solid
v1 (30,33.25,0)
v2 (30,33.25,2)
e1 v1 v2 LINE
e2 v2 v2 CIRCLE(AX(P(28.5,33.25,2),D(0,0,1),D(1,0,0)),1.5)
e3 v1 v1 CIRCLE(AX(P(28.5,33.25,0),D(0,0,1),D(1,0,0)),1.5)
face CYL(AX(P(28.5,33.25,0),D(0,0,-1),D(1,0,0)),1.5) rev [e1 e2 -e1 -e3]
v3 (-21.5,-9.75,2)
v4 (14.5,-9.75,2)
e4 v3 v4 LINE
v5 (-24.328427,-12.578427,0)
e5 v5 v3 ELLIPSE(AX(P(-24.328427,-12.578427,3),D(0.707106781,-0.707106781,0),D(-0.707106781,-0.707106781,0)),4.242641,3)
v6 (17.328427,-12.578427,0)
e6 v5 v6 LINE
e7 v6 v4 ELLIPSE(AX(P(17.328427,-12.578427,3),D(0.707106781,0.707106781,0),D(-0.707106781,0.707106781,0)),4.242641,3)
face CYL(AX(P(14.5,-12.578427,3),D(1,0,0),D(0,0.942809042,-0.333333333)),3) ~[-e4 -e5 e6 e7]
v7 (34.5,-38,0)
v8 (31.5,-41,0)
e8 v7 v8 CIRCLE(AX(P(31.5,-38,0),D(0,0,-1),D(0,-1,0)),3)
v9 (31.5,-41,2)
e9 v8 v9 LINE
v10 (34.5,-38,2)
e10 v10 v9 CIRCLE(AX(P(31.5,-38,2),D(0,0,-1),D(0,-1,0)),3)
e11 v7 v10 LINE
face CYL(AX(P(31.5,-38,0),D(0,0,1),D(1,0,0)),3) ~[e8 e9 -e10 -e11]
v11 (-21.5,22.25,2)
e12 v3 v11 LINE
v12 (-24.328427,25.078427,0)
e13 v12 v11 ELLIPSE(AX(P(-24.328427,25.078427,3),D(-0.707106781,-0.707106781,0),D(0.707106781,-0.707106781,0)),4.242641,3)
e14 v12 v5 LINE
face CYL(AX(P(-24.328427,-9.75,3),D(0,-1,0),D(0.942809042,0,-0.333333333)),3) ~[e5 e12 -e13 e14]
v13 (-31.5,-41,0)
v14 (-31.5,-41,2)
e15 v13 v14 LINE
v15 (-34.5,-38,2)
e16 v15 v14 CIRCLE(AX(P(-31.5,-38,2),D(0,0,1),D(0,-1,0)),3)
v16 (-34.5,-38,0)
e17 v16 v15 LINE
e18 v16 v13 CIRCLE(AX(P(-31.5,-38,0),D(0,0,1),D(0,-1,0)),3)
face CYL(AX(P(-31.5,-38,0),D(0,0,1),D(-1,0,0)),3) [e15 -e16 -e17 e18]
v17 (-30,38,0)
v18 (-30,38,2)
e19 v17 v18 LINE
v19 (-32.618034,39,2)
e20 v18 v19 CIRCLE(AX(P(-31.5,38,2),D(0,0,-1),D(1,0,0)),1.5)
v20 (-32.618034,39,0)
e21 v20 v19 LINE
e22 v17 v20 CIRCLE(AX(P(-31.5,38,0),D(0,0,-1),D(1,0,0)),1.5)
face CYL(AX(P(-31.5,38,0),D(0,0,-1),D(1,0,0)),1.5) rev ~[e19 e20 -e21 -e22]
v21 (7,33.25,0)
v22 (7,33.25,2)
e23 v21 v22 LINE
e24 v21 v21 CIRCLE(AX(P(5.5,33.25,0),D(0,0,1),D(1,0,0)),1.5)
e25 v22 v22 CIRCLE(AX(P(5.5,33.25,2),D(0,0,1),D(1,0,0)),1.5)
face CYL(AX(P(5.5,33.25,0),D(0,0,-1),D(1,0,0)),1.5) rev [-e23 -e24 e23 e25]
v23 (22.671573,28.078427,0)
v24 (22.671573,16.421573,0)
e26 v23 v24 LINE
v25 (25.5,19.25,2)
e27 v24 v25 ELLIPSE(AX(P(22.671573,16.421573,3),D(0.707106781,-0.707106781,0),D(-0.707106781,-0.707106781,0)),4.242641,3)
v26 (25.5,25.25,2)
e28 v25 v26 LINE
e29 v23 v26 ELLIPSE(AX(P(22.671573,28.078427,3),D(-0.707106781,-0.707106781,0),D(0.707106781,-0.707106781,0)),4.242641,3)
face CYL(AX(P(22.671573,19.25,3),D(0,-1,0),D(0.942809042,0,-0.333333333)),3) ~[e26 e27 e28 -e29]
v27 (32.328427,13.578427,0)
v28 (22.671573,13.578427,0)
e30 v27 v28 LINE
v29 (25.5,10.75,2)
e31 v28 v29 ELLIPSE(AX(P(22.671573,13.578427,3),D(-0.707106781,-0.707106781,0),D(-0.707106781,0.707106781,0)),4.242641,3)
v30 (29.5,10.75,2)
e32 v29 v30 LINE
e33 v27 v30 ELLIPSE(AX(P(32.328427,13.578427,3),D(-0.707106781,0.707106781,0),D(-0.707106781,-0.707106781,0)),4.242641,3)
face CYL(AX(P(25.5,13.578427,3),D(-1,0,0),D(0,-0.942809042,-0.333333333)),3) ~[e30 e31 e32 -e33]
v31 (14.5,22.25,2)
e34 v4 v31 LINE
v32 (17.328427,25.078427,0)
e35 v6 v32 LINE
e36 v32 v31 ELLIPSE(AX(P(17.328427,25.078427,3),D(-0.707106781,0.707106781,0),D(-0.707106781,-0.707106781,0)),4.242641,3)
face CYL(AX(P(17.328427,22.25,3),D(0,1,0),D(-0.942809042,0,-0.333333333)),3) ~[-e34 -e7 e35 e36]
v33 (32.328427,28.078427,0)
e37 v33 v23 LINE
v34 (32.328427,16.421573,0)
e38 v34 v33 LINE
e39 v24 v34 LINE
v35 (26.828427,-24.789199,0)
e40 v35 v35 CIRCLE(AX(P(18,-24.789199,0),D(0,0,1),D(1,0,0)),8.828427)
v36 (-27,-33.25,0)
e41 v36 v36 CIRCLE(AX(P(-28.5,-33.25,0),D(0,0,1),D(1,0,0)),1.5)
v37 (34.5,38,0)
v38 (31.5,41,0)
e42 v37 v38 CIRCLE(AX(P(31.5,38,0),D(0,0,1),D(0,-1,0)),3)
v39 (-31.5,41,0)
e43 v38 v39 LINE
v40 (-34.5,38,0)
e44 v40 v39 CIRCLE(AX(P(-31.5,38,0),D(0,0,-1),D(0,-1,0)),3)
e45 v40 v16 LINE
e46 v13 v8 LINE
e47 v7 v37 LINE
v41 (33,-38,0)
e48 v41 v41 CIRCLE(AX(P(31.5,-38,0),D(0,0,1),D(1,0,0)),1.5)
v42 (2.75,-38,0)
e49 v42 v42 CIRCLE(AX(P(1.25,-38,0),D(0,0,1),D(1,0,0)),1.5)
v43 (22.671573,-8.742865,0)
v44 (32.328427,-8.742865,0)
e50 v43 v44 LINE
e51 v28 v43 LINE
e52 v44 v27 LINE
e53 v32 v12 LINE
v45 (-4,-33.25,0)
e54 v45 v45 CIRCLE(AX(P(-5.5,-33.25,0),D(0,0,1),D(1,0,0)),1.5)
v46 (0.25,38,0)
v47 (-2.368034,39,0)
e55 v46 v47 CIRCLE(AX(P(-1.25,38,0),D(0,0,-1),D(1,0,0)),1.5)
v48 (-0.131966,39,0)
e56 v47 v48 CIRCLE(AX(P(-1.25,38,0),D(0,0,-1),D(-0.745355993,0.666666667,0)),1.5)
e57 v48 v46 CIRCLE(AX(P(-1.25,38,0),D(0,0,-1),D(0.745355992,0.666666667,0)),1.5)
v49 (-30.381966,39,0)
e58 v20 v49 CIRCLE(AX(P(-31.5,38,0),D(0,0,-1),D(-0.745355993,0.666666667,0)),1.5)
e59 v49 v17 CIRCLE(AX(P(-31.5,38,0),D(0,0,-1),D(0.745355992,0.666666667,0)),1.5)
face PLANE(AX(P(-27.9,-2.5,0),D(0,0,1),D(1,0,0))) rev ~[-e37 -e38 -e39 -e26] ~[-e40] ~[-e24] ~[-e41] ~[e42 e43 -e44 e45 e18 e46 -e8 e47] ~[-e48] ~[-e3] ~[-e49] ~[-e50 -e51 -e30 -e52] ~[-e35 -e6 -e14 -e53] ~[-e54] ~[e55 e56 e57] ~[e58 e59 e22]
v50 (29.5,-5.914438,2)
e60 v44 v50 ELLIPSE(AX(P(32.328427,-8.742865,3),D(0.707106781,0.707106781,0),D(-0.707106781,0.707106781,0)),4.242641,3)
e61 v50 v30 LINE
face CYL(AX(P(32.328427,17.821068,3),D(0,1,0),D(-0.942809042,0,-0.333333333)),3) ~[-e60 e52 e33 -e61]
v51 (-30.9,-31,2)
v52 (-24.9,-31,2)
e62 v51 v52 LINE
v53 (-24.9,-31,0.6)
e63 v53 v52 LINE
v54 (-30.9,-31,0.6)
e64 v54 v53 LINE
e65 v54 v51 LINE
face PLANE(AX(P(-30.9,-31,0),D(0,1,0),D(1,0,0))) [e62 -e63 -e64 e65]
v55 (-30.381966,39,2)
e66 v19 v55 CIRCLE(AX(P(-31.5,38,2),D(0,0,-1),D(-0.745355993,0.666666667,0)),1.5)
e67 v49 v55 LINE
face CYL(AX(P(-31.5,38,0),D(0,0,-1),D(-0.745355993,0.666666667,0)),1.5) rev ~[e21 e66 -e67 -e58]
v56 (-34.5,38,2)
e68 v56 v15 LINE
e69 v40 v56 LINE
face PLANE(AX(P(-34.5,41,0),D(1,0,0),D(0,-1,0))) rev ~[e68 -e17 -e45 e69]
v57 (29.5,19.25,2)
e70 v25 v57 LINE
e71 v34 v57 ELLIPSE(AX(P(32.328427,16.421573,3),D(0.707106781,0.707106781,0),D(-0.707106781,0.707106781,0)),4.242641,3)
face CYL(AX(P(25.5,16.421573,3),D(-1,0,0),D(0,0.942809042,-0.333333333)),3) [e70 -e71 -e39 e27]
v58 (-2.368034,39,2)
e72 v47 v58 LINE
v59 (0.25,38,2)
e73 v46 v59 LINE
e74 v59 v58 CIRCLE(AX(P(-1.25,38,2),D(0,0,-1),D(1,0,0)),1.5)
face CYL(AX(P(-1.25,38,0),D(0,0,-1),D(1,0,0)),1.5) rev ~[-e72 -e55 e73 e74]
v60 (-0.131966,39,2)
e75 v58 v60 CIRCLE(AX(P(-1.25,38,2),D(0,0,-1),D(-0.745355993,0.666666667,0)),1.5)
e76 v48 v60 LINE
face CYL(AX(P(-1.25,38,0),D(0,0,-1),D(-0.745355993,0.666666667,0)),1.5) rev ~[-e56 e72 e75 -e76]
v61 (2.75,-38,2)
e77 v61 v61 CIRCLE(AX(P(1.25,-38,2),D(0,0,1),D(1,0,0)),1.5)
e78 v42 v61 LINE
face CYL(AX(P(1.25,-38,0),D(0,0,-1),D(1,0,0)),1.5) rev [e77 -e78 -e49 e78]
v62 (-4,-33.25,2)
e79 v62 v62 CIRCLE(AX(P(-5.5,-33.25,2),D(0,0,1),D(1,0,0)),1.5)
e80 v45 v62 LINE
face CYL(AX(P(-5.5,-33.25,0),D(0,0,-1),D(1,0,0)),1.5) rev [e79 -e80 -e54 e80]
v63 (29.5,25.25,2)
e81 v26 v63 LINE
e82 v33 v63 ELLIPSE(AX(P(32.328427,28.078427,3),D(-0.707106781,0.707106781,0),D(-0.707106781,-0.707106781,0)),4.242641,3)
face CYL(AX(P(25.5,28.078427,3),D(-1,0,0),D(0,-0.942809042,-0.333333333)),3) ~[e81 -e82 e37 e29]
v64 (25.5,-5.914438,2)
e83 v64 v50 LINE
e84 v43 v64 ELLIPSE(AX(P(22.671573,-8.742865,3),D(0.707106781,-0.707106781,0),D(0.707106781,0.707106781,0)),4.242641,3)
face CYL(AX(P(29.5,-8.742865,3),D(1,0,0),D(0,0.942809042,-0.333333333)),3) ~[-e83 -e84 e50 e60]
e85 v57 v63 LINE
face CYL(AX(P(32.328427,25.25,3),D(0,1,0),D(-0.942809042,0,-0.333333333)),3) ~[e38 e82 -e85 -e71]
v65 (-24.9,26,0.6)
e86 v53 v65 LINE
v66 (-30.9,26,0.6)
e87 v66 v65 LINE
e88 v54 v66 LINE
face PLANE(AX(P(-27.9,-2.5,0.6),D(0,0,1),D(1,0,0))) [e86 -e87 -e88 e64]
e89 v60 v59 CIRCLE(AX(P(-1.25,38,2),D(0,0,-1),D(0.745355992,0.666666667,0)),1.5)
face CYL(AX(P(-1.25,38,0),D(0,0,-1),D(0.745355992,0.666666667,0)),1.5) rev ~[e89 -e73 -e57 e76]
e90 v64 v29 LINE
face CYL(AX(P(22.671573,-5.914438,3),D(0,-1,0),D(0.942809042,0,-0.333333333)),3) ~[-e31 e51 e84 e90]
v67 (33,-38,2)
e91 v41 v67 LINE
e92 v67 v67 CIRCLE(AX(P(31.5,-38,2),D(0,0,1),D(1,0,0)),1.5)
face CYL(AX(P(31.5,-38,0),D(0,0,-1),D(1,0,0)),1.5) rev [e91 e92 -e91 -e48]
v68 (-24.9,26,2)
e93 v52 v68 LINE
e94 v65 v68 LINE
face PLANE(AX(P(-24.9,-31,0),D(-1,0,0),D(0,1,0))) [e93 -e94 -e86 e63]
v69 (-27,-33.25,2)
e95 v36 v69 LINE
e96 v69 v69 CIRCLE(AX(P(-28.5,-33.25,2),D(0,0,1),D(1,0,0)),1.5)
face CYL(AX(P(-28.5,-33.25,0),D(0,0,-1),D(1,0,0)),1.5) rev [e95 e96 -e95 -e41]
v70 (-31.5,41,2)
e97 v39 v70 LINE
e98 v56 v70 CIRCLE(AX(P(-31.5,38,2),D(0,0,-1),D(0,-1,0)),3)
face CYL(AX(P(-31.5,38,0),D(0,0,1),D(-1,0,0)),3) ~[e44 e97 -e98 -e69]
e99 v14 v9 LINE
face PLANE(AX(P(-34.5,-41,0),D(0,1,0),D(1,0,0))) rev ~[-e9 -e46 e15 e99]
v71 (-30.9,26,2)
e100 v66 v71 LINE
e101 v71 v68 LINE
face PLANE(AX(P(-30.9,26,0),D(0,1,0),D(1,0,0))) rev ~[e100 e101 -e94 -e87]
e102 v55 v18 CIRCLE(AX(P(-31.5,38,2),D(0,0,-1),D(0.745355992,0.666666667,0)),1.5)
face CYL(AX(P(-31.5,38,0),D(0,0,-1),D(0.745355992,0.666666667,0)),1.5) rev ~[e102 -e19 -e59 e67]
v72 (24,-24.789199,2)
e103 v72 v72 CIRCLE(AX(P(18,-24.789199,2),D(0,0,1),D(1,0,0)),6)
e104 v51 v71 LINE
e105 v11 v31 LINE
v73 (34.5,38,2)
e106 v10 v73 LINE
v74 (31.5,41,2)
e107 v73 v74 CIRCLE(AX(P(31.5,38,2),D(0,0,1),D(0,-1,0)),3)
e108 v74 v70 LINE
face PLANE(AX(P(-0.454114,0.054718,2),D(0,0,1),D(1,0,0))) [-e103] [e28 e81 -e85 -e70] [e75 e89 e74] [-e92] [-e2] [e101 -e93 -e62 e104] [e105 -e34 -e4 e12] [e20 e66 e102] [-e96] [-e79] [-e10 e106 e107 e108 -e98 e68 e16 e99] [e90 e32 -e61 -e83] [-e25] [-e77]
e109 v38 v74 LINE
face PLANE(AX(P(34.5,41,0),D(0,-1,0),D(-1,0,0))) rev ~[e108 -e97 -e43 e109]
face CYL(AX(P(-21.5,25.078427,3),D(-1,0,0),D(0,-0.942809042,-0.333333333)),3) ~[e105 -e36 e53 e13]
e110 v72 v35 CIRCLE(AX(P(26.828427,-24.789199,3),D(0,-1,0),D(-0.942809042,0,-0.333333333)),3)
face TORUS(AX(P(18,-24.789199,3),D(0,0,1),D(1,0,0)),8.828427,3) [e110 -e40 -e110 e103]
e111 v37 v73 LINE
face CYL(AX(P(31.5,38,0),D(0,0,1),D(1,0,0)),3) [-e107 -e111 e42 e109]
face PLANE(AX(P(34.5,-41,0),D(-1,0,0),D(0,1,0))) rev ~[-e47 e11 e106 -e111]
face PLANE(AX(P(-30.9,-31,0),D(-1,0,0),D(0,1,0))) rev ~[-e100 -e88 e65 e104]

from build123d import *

# Parameters (mm, degrees)
F0_R          = 1.5
F0_R_2        = 6
F0_W          = 6
F0_H          = 57
F0_W_2        = 36
F0_H_2        = 32
F0_W_3        = 4
F0_H_3        = 16.6644380502
F0_H_4        = 6
F0_W_4        = 4.7
F0_H_5        = 2
F0_W_5        = 13
F0_W_6        = 2.3
F0_W_7        = 1.5
F0_W_8        = 9
F0_W_9        = 11
F1_DEPTH      = 2
F2_T1_DEPTH   = 16.6644380502
F2_T3_DEPTH   = 4
F2_T5_DEPTH   = 6
F2_T7_DEPTH   = 32
F2_T9_DEPTH   = 36
F2_T17_DEPTH  = 11.0710678119
F2_T21_DEPTH  = 23.7355058621
F2_T28_DEPTH  = 11.0710678119
F2_T32_DEPTH  = 23.7355058621
F2_T39_DEPTH  = 23.7355058621
F2_T43_DEPTH  = 11.0710678119
F2_T51_DEPTH  = 11.0710678119
F2_T56_DEPTH  = 23.7355058621
F2_T63_DEPTH  = 13.0710678119
F2_T67_DEPTH  = 11.0710678119
F2_T75_DEPTH  = 13.0710678119
F2_T79_DEPTH  = 11.0710678119
F2_T86_DEPTH  = 11.0710678119
F2_T91_DEPTH  = 13.0710678119
F2_S93_R      = 1.5
F2_T94_DEPTH  = 8
F2_T100_DEPTH = 13.0710678119
F2_T104_DEPTH = 11.0710678119
F2_T111_DEPTH = 43.0710678119
F2_T115_DEPTH = 39.0710678119
F2_T122_DEPTH = 39.0710678119
F2_T126_DEPTH = 43.0710678119
F2_T133_DEPTH = 39.0710678119
F2_T137_DEPTH = 43.0710678119
F2_T145_DEPTH = 39.0710678119
F2_T149_DEPTH = 43.0710678119
F3_R          = 3
F4_DEPTH      = 0.6


# Not quite as in the source:
# - a fillet or chamfer that OpenCascade refuses, or shapes differently, is made with other operations: its cross-section is extruded or revolved along the edge and cut away or added


with BuildPart() as f1:
    # F0 (on Top) → F1 (new body)
    with BuildSketch(Plane.XY):
        with BuildLine():
            Line((12.5, -41), (34.5, -41))
            Line((34.5, -41), (34.5, 39))
            Line((34.5, 39), (28.5, 39))
            Line((28.5, 39), (25.5, 39))
            Line((25.5, 39), (20.8, 39))
            Line((20.8, 39), (7.8, 39))
            Line((7.8, 39), (5.5, 39))
            Line((5.5, 39), (-0.1319660113, 39))
            ThreePointArc((-0.1319660113, 39), (0.1512585384, 38.5352331347), (0.25, 38))
            ThreePointArc((0.25, 38), (-1.7852331347, 36.5987414616), (-2.3680339887, 39))
            Line((-2.3680339887, 39), (-5.5, 39))
            Line((-5.5, 39), (-14.5, 39))
            Line((-14.5, 39), (-25.5, 39))
            Line((-25.5, 39), (-27, 39))
            Line((-27, 39), (-28.5, 39))
            Line((-28.5, 39), (-30.3819660113, 39))
            ThreePointArc((-30.3819660113, 39), (-30.0987414616, 38.5352331347), (-30, 38))
            ThreePointArc((-30, 38), (-32.0352331347, 36.5987414616), (-32.6180339887, 39))
            Line((-32.6180339887, 39), (-34.5, 39))
            Line((-34.5, 39), (-34.5, -41))
            Line((-34.5, -41), (-12.5, -41))
            Line((-12.5, -41), (-10.5, -41))
            Line((-10.5, -41), (10.5, -41))
            Line((10.5, -41), (12.5, -41))
        make_face()
        with Locations((-28.5, -33.25)):
            Circle(F0_R, mode=Mode.SUBTRACT)
        with Locations((-5.5, -33.25)):
            Circle(F0_R, mode=Mode.SUBTRACT)
        with Locations((1.25, -38)):
            Circle(F0_R, mode=Mode.SUBTRACT)
        with Locations((31.5, -38)):
            Circle(F0_R, mode=Mode.SUBTRACT)
        with Locations((18, -24.7891994715)):
            Circle(F0_R_2, mode=Mode.SUBTRACT)
        with Locations((-27.9, -2.5)):
            Rectangle(F0_W, F0_H, mode=Mode.SUBTRACT)
        with Locations((-3.5, 6.25)):
            Rectangle(F0_W_2, F0_H_2, mode=Mode.SUBTRACT)
        with Locations((-28.5, 33.25)):
            Circle(F0_R, mode=Mode.SUBTRACT)
        with Locations((-5.5, 33.25)):
            Circle(F0_R, mode=Mode.SUBTRACT)
        with Locations((27.5, 2.4177809749)):
            Rectangle(F0_W_3, F0_H_3, mode=Mode.SUBTRACT)
        with Locations((5.5, 33.25)):
            Circle(F0_R, mode=Mode.SUBTRACT)
        with Locations((27.5, 22.25)):
            Rectangle(F0_W_3, F0_H_4, mode=Mode.SUBTRACT)
        with Locations((28.5, 33.25)):
            Circle(F0_R, mode=Mode.SUBTRACT)
        Polygon((28.5, 39), (34.5, 39), (34.5, 41), (28, 41), (25.5, 41), (25.5, 39), align=None)
        with Locations((23.15, 40)):
            Rectangle(F0_W_4, F0_H_5)
        with Locations((14.3, 40)):
            Rectangle(F0_W_5, F0_H_5)
        with Locations((6.65, 40)):
            Rectangle(F0_W_6, F0_H_5)
        with BuildLine():
            Line((-34.5, 41), (-34.5, 39))
            Line((-34.5, 39), (-32.6180339887, 39))
            ThreePointArc((-32.6180339887, 39), (-31.5, 39.5), (-30.3819660113, 39))
            Line((-30.3819660113, 39), (-28.5, 39))
            Line((-28.5, 39), (-27, 39))
            Line((-27, 39), (-27, 41))
            Line((-27, 41), (-34.5, 41))
        make_face()
        with BuildLine():
            Line((-0.1319660113, 39), (5.5, 39))
            Line((5.5, 39), (5.5, 41))
            Line((5.5, 41), (-5.5, 41))
            Line((-5.5, 41), (-5.5, 39))
            Line((-5.5, 39), (-2.3680339887, 39))
            ThreePointArc((-2.3680339887, 39), (-1.25, 39.5), (-0.1319660113, 39))
        make_face()
        with Locations((-26.25, 40)):
            Rectangle(F0_W_7, F0_H_5)
        with Locations((-10, 40)):
            Rectangle(F0_W_8, F0_H_5)
        with Locations((-20, 40)):
            Rectangle(F0_W_9, F0_H_5)
        with Locations((-28.5, 33.25)):
            Circle(F0_R)
        with Locations((-5.5, 33.25)):
            Circle(F0_R)
    extrude(amount=F1_DEPTH)

    # F2: fillet of radius 3 on 13 edges, made by hand

    # F2_s2 → F2_t1 (cut)
    with BuildSketch(Plane.XZ.offset(-10.75)):
        with BuildLine():
            ThreePointArc((25.5, 2), (24.4036236828, 0.5505102572), (22.6715728753, 0))
            Line((22.6715728753, 0), (25.5, 0))
            Line((25.5, 0), (25.5, 2))
        make_face()
        with BuildLine():
            ThreePointArc((29.5, 2), (30.5963763172, 0.5505102572), (32.3284271247, 0))
            Line((32.3284271247, 0), (29.5, 0))
            Line((29.5, 0), (29.5, 2))
        make_face()
    extrude(amount=F2_T1_DEPTH, mode=Mode.SUBTRACT)

    # F2_s4 → F2_t3 (cut)
    with BuildSketch(Plane.YZ.offset(25.5)):
        with BuildLine():
            ThreePointArc((-5.9144380502, 2), (-7.0108143674, 0.5505102572), (-8.742865175, 0))
            Line((-8.742865175, 0), (-5.9144380502, 0))
            Line((-5.9144380502, 0), (-5.9144380502, 2))
        make_face()
        with BuildLine():
            ThreePointArc((10.75, 2), (11.8463763172, 0.5505102572), (13.5784271247, 0))
            Line((13.5784271247, 0), (10.75, 0))
            Line((10.75, 0), (10.75, 2))
        make_face()
        with BuildLine():
            ThreePointArc((19.25, 2), (18.1536236828, 0.5505102572), (16.4215728753, 0))
            Line((16.4215728753, 0), (19.25, 0))
            Line((19.25, 0), (19.25, 2))
        make_face()
        with BuildLine():
            ThreePointArc((25.25, 2), (26.3463763172, 0.5505102572), (28.0784271247, 0))
            Line((28.0784271247, 0), (25.25, 0))
            Line((25.25, 0), (25.25, 2))
        make_face()
    extrude(amount=F2_T3_DEPTH, mode=Mode.SUBTRACT)

    # F2_s6 → F2_t5 (cut)
    with BuildSketch(Plane.XZ.offset(-25.25)):
        with BuildLine():
            ThreePointArc((29.5, 2), (30.5963763172, 0.5505102572), (32.3284271247, 0))
            Line((32.3284271247, 0), (29.5, 0))
            Line((29.5, 0), (29.5, 2))
        make_face()
        with BuildLine():
            ThreePointArc((25.5, 2), (24.4036236828, 0.5505102572), (22.6715728753, 0))
            Line((22.6715728753, 0), (25.5, 0))
            Line((25.5, 0), (25.5, 2))
        make_face()
    extrude(amount=F2_T5_DEPTH, mode=Mode.SUBTRACT)

    # F2_s8 → F2_t7 (cut)
    with BuildSketch(Plane.XZ.offset(-22.25)):
        with BuildLine():
            ThreePointArc((14.5, 2), (15.5963763172, 0.5505102572), (17.3284271247, 0))
            Line((17.3284271247, 0), (14.5, 0))
            Line((14.5, 0), (14.5, 2))
        make_face()
        with BuildLine():
            ThreePointArc((-21.5, 2), (-22.5963763172, 0.5505102572), (-24.3284271247, 0))
            Line((-24.3284271247, 0), (-21.5, 0))
            Line((-21.5, 0), (-21.5, 2))
        make_face()
    extrude(amount=F2_T7_DEPTH, mode=Mode.SUBTRACT)

    # F2_s10 → F2_t9 (cut)
    with BuildSketch(Plane.YZ.offset(-21.5)):
        with BuildLine():
            ThreePointArc((-9.75, 2), (-10.8463763172, 0.5505102572), (-12.5784271247, 0))
            Line((-12.5784271247, 0), (-9.75, 0))
            Line((-9.75, 0), (-9.75, 2))
        make_face()
        with BuildLine():
            ThreePointArc((22.25, 2), (23.3463763172, 0.5505102572), (25.0784271247, 0))
            Line((25.0784271247, 0), (22.25, 0))
            Line((22.25, 0), (22.25, 2))
        make_face()
    extrude(amount=F2_T9_DEPTH, mode=Mode.SUBTRACT)

    # F2_s11 → F2_t12 (revolve, cut)
    with BuildSketch(Plane.XZ.offset(24.7891994715)):
        with BuildLine():
            ThreePointArc((24, 2), (25.0963763172, 0.5505102572), (26.8284271247, 0))
            Line((26.8284271247, 0), (24, 0))
            Line((24, 0), (24, 2))
        make_face()
    revolve(axis=Axis((18, -24.7891994715, 0), (0, 0, 1)), mode=Mode.SUBTRACT)


with BuildPart() as f2_tool15:
    # F2_s16 → F2_t17 (new body)
    with BuildSketch(Plane.YZ.offset(29.5)):
        with BuildLine():
            ThreePointArc((-5.9144380502, 2), (-7.0108143674, 0.5505102572), (-8.742865175, 0))
            Line((-8.742865175, 0), (-5.9144380502, 0))
            Line((-5.9144380502, 0), (-5.9144380502, 2))
        make_face()
    extrude(amount=-F2_T17_DEPTH)

    split(bisect_by=Plane.YZ.offset(25.5), keep=Keep.BOTTOM)


with BuildPart() as f2_tool19:
    # F2_s20 → F2_t21 (new body)
    with BuildSketch(Plane.XZ.offset(12.9855058621)):
        with BuildLine():
            ThreePointArc((25.5, 2), (24.4036236828, 0.5505102572), (22.6715728753, 0))
            Line((22.6715728753, 0), (25.5, 0))
            Line((25.5, 0), (25.5, 2))
        make_face()
    extrude(amount=-F2_T21_DEPTH)

    split(bisect_by=Plane.XZ.offset(5.9144380502), keep=Keep.TOP)


with BuildPart() as f2_tool15_1:
    add(f2_tool15.part)

    # F2_t23: intersect F2_tool19
    add(f2_tool19.part, mode=Mode.INTERSECT)


with BuildPart() as f1_1:
    add(f1.part)

    # F2_t13: cut F2_tool15
    add(f2_tool15_1.part, mode=Mode.SUBTRACT)


with BuildPart() as f2_tool26:
    # F2_s27 → F2_t28 (new body)
    with BuildSketch(Plane.YZ.offset(18.4289321881)):
        with BuildLine():
            ThreePointArc((10.75, 2), (11.8463763172, 0.5505102572), (13.5784271247, 0))
            Line((13.5784271247, 0), (10.75, 0))
            Line((10.75, 0), (10.75, 2))
        make_face()
    extrude(amount=F2_T28_DEPTH)

    split(bisect_by=Plane.YZ.offset(25.5), keep=Keep.BOTTOM)


with BuildPart() as f2_tool30:
    # F2_s31 → F2_t32 (new body)
    with BuildSketch(Plane.XZ.offset(5.9144380502)):
        with BuildLine():
            ThreePointArc((25.5, 2), (24.4036236828, 0.5505102572), (22.6715728753, 0))
            Line((22.6715728753, 0), (25.5, 0))
            Line((25.5, 0), (25.5, 2))
        make_face()
    extrude(amount=-F2_T32_DEPTH)

    split(bisect_by=Plane.XZ.offset(-10.75), keep=Keep.BOTTOM)


with BuildPart() as f2_tool26_1:
    add(f2_tool26.part)

    # F2_t34: intersect F2_tool30
    add(f2_tool30.part, mode=Mode.INTERSECT)


with BuildPart() as f1_2:
    add(f1_1.part)

    # F2_t24: cut F2_tool26
    add(f2_tool26_1.part, mode=Mode.SUBTRACT)


with BuildPart() as f2_tool37:
    # F2_s38 → F2_t39 (new body)
    with BuildSketch(Plane.XZ.offset(-10.75)):
        with BuildLine():
            ThreePointArc((29.5, 2), (30.5963763172, 0.5505102572), (32.3284271247, 0))
            Line((32.3284271247, 0), (29.5, 0))
            Line((29.5, 0), (29.5, 2))
        make_face()
    extrude(amount=F2_T39_DEPTH)

    split(bisect_by=Plane.XZ.offset(5.9144380502), keep=Keep.TOP)


with BuildPart() as f2_tool41:
    # F2_s42 → F2_t43 (new body)
    with BuildSketch(Plane.YZ.offset(36.5710678119)):
        with BuildLine():
            ThreePointArc((-5.9144380502, 2), (-7.0108143674, 0.5505102572), (-8.742865175, 0))
            Line((-8.742865175, 0), (-5.9144380502, 0))
            Line((-5.9144380502, 0), (-5.9144380502, 2))
        make_face()
    extrude(amount=-F2_T43_DEPTH)

    split(bisect_by=Plane.YZ.offset(34.5), keep=Keep.BOTTOM)

    split(bisect_by=Plane.YZ.offset(29.5), keep=Keep.TOP)


with BuildPart() as f2_tool37_1:
    add(f2_tool37.part)

    # F2_t46: intersect F2_tool41
    add(f2_tool41.part, mode=Mode.INTERSECT)


with BuildPart() as f1_3:
    add(f1_2.part)

    # F2_t35: cut F2_tool37
    add(f2_tool37_1.part, mode=Mode.SUBTRACT)


with BuildPart() as f2_tool49:
    # F2_s50 → F2_t51 (new body)
    with BuildSketch(Plane.YZ.offset(25.5)):
        with BuildLine():
            ThreePointArc((10.75, 2), (11.8463763172, 0.5505102572), (13.5784271247, 0))
            Line((13.5784271247, 0), (10.75, 0))
            Line((10.75, 0), (10.75, 2))
        make_face()
    extrude(amount=F2_T51_DEPTH)

    split(bisect_by=Plane.YZ.offset(34.5), keep=Keep.BOTTOM)

    split(bisect_by=Plane.YZ.offset(29.5), keep=Keep.TOP)


with BuildPart() as f2_tool54:
    # F2_s55 → F2_t56 (new body)
    with BuildSketch(Plane.XZ.offset(-17.8210678119)):
        with BuildLine():
            ThreePointArc((29.5, 2), (30.5963763172, 0.5505102572), (32.3284271247, 0))
            Line((32.3284271247, 0), (29.5, 0))
            Line((29.5, 0), (29.5, 2))
        make_face()
    extrude(amount=F2_T56_DEPTH)

    split(bisect_by=Plane.XZ.offset(-10.75), keep=Keep.BOTTOM)


with BuildPart() as f2_tool49_1:
    add(f2_tool49.part)

    # F2_t58: intersect F2_tool54
    add(f2_tool54.part, mode=Mode.INTERSECT)


with BuildPart() as f1_4:
    add(f1_3.part)

    # F2_t47: cut F2_tool49
    add(f2_tool49_1.part, mode=Mode.SUBTRACT)


with BuildPart() as f2_tool61:
    # F2_s62 → F2_t63 (new body)
    with BuildSketch(Plane.XZ.offset(-25.25)):
        with BuildLine():
            ThreePointArc((29.5, 2), (30.5963763172, 0.5505102572), (32.3284271247, 0))
            Line((32.3284271247, 0), (29.5, 0))
            Line((29.5, 0), (29.5, 2))
        make_face()
    extrude(amount=F2_T63_DEPTH)

    split(bisect_by=Plane.XZ.offset(-19.25), keep=Keep.TOP)


with BuildPart() as f2_tool65:
    # F2_s66 → F2_t67 (new body)
    with BuildSketch(Plane.YZ.offset(36.5710678119)):
        with BuildLine():
            ThreePointArc((19.25, 2), (18.1536236828, 0.5505102572), (16.4215728753, 0))
            Line((16.4215728753, 0), (19.25, 0))
            Line((19.25, 0), (19.25, 2))
        make_face()
    extrude(amount=-F2_T67_DEPTH)

    split(bisect_by=Plane.YZ.offset(34.5), keep=Keep.BOTTOM)

    split(bisect_by=Plane.YZ.offset(29.5), keep=Keep.TOP)


with BuildPart() as f2_tool61_1:
    add(f2_tool61.part)

    # F2_t70: intersect F2_tool65
    add(f2_tool65.part, mode=Mode.INTERSECT)


with BuildPart() as f1_5:
    add(f1_4.part)

    # F2_t59: cut F2_tool61
    add(f2_tool61_1.part, mode=Mode.SUBTRACT)


with BuildPart() as f2_tool73:
    # F2_s74 → F2_t75 (new body)
    with BuildSketch(Plane.XZ.offset(-12.1789321881)):
        with BuildLine():
            ThreePointArc((25.5, 2), (24.4036236828, 0.5505102572), (22.6715728753, 0))
            Line((22.6715728753, 0), (25.5, 0))
            Line((25.5, 0), (25.5, 2))
        make_face()
    extrude(amount=-F2_T75_DEPTH)

    split(bisect_by=Plane.XZ.offset(-19.25), keep=Keep.TOP)


with BuildPart() as f2_tool77:
    # F2_s78 → F2_t79 (new body)
    with BuildSketch(Plane.YZ.offset(29.5)):
        with BuildLine():
            ThreePointArc((19.25, 2), (18.1536236828, 0.5505102572), (16.4215728753, 0))
            Line((16.4215728753, 0), (19.25, 0))
            Line((19.25, 0), (19.25, 2))
        make_face()
    extrude(amount=-F2_T79_DEPTH)

    split(bisect_by=Plane.YZ.offset(25.5), keep=Keep.BOTTOM)


with BuildPart() as f2_tool73_1:
    add(f2_tool73.part)

    # F2_t81: intersect F2_tool77
    add(f2_tool77.part, mode=Mode.INTERSECT)


with BuildPart() as f1_6:
    add(f1_5.part)

    # F2_t71: cut F2_tool73
    add(f2_tool73_1.part, mode=Mode.SUBTRACT)


with BuildPart() as f2_tool84:
    # F2_s85 → F2_t86 (new body)
    with BuildSketch(Plane.YZ.offset(25.5)):
        with BuildLine():
            ThreePointArc((25.25, 2), (26.3463763172, 0.5505102572), (28.0784271247, 0))
            Line((28.0784271247, 0), (25.25, 0))
            Line((25.25, 0), (25.25, 2))
        make_face()
    extrude(amount=F2_T86_DEPTH)

    split(bisect_by=Plane.YZ.offset(34.5), keep=Keep.BOTTOM)

    split(bisect_by=Plane.YZ.offset(29.5), keep=Keep.TOP)


with BuildPart() as f2_tool89:
    # F2_s90 → F2_t91 (new body)
    with BuildSketch(Plane.XZ.offset(-32.3210678119)):
        with BuildLine():
            ThreePointArc((29.5, 2), (30.5963763172, 0.5505102572), (32.3284271247, 0))
            Line((32.3284271247, 0), (29.5, 0))
            Line((29.5, 0), (29.5, 2))
        make_face()
    extrude(amount=F2_T91_DEPTH)

    split(bisect_by=Plane.XZ.offset(-25.25), keep=Keep.BOTTOM)

    # F2_s93 → F2_t94 (cut, symmetric)
    with BuildSketch(Plane.XY.offset(1)):
        with Locations((28.5, 33.25)):
            Circle(F2_S93_R)
    extrude(amount=F2_T94_DEPTH, both=True, mode=Mode.SUBTRACT)


with BuildPart() as f2_tool84_1:
    add(f2_tool84.part)

    # F2_t95: intersect F2_tool89
    add(f2_tool89.part, mode=Mode.INTERSECT)


with BuildPart() as f1_7:
    add(f1_6.part)

    # F2_t82: cut F2_tool84
    add(f2_tool84_1.part, mode=Mode.SUBTRACT)


with BuildPart() as f2_tool98:
    # F2_s99 → F2_t100 (new body)
    with BuildSketch(Plane.XZ.offset(-19.25)):
        with BuildLine():
            ThreePointArc((25.5, 2), (24.4036236828, 0.5505102572), (22.6715728753, 0))
            Line((22.6715728753, 0), (25.5, 0))
            Line((25.5, 0), (25.5, 2))
        make_face()
    extrude(amount=-F2_T100_DEPTH)

    split(bisect_by=Plane.XZ.offset(-25.25), keep=Keep.BOTTOM)


with BuildPart() as f2_tool102:
    # F2_s103 → F2_t104 (new body)
    with BuildSketch(Plane.YZ.offset(18.4289321881)):
        with BuildLine():
            ThreePointArc((25.25, 2), (26.3463763172, 0.5505102572), (28.0784271247, 0))
            Line((28.0784271247, 0), (25.25, 0))
            Line((25.25, 0), (25.25, 2))
        make_face()
    extrude(amount=F2_T104_DEPTH)

    split(bisect_by=Plane.YZ.offset(25.5), keep=Keep.BOTTOM)


with BuildPart() as f2_tool98_1:
    add(f2_tool98.part)

    # F2_t106: intersect F2_tool102
    add(f2_tool102.part, mode=Mode.INTERSECT)


with BuildPart() as f1_8:
    add(f1_7.part)

    # F2_t96: cut F2_tool98
    add(f2_tool98_1.part, mode=Mode.SUBTRACT)


with BuildPart() as f2_tool109:
    # F2_s110 → F2_t111 (new body)
    with BuildSketch(Plane.YZ.offset(-21.5)):
        with BuildLine():
            ThreePointArc((22.25, 2), (23.3463763172, 0.5505102572), (25.0784271247, 0))
            Line((25.0784271247, 0), (22.25, 0))
            Line((22.25, 0), (22.25, 2))
        make_face()
    extrude(amount=F2_T111_DEPTH)

    split(bisect_by=Plane.YZ.offset(14.5), keep=Keep.TOP)


with BuildPart() as f2_tool113:
    # F2_s114 → F2_t115 (new body)
    with BuildSketch(Plane.XZ.offset(-29.3210678119)):
        with BuildLine():
            ThreePointArc((14.5, 2), (15.5963763172, 0.5505102572), (17.3284271247, 0))
            Line((17.3284271247, 0), (14.5, 0))
            Line((14.5, 0), (14.5, 2))
        make_face()
    extrude(amount=F2_T115_DEPTH)

    split(bisect_by=Plane.XZ.offset(-22.25), keep=Keep.BOTTOM)


with BuildPart() as f2_tool109_1:
    add(f2_tool109.part)

    # F2_t117: intersect F2_tool113
    add(f2_tool113.part, mode=Mode.INTERSECT)


with BuildPart() as f1_9:
    add(f1_8.part)

    # F2_t107: cut F2_tool109
    add(f2_tool109_1.part, mode=Mode.SUBTRACT)


with BuildPart() as f2_tool120:
    # F2_s121 → F2_t122 (new body)
    with BuildSketch(Plane.XZ.offset(-22.25)):
        with BuildLine():
            ThreePointArc((14.5, 2), (15.5963763172, 0.5505102572), (17.3284271247, 0))
            Line((17.3284271247, 0), (14.5, 0))
            Line((14.5, 0), (14.5, 2))
        make_face()
    extrude(amount=F2_T122_DEPTH)

    split(bisect_by=Plane.XZ.offset(9.75), keep=Keep.TOP)


with BuildPart() as f2_tool124:
    # F2_s125 → F2_t126 (new body)
    with BuildSketch(Plane.YZ.offset(21.5710678119)):
        with BuildLine():
            ThreePointArc((-9.75, 2), (-10.8463763172, 0.5505102572), (-12.5784271247, 0))
            Line((-12.5784271247, 0), (-9.75, 0))
            Line((-9.75, 0), (-9.75, 2))
        make_face()
    extrude(amount=-F2_T126_DEPTH)

    split(bisect_by=Plane.YZ.offset(14.5), keep=Keep.TOP)


with BuildPart() as f2_tool120_1:
    add(f2_tool120.part)

    # F2_t128: intersect F2_tool124
    add(f2_tool124.part, mode=Mode.INTERSECT)


with BuildPart() as f1_10:
    add(f1_9.part)

    # F2_t118: cut F2_tool120
    add(f2_tool120_1.part, mode=Mode.SUBTRACT)


with BuildPart() as f2_tool131:
    # F2_s132 → F2_t133 (new body)
    with BuildSketch(Plane.XZ.offset(16.8210678119)):
        with BuildLine():
            ThreePointArc((-21.5, 2), (-22.5963763172, 0.5505102572), (-24.3284271247, 0))
            Line((-24.3284271247, 0), (-21.5, 0))
            Line((-21.5, 0), (-21.5, 2))
        make_face()
    extrude(amount=-F2_T133_DEPTH)

    split(bisect_by=Plane.XZ.offset(9.75), keep=Keep.TOP)


with BuildPart() as f2_tool135:
    # F2_s136 → F2_t137 (new body)
    with BuildSketch(Plane.YZ.offset(14.5)):
        with BuildLine():
            ThreePointArc((-9.75, 2), (-10.8463763172, 0.5505102572), (-12.5784271247, 0))
            Line((-12.5784271247, 0), (-9.75, 0))
            Line((-9.75, 0), (-9.75, 2))
        make_face()
    extrude(amount=-F2_T137_DEPTH)

    split(bisect_by=Plane.YZ.offset(-24.9), keep=Keep.TOP)

    split(bisect_by=Plane.YZ.offset(-21.5), keep=Keep.BOTTOM)


with BuildPart() as f2_tool131_1:
    add(f2_tool131.part)

    # F2_t140: intersect F2_tool135
    add(f2_tool135.part, mode=Mode.INTERSECT)


with BuildPart() as f1_11:
    add(f1_10.part)

    # F2_t129: cut F2_tool131
    add(f2_tool131_1.part, mode=Mode.SUBTRACT)


with BuildPart() as f2_tool143:
    # F2_s144 → F2_t145 (new body)
    with BuildSketch(Plane.XZ.offset(9.75)):
        with BuildLine():
            ThreePointArc((-21.5, 2), (-22.5963763172, 0.5505102572), (-24.3284271247, 0))
            Line((-24.3284271247, 0), (-21.5, 0))
            Line((-21.5, 0), (-21.5, 2))
        make_face()
    extrude(amount=-F2_T145_DEPTH)

    split(bisect_by=Plane.XZ.offset(-22.25), keep=Keep.BOTTOM)


with BuildPart() as f2_tool147:
    # F2_s148 → F2_t149 (new body)
    with BuildSketch(Plane.YZ.offset(-28.5710678119)):
        with BuildLine():
            ThreePointArc((22.25, 2), (23.3463763172, 0.5505102572), (25.0784271247, 0))
            Line((25.0784271247, 0), (22.25, 0))
            Line((22.25, 0), (22.25, 2))
        make_face()
    extrude(amount=F2_T149_DEPTH)

    split(bisect_by=Plane.YZ.offset(-24.9), keep=Keep.TOP)

    split(bisect_by=Plane.YZ.offset(-21.5), keep=Keep.BOTTOM)


with BuildPart() as f2_tool143_1:
    add(f2_tool143.part)

    # F2_t152: intersect F2_tool147
    add(f2_tool147.part, mode=Mode.INTERSECT)


with BuildPart() as f1_12:
    add(f1_11.part)

    # F2_t141: cut F2_tool143
    add(f2_tool143_1.part, mode=Mode.SUBTRACT)

    # F3
    f3_edges = [f1_12.edges().sort_by_distance(p)[0] for p in [
        (-34.5, 41, 1),
        (34.5, 41, 1),
        (34.5, -41, 1),
        (-34.5, -41, 1),
    ]]
    fillet(f3_edges, radius=F3_R)

    # F0 (on Top) → F4 (join)
    with BuildSketch(Plane.XY):
        with Locations((-27.9, -2.5)):
            Rectangle(F0_W, F0_H)
    extrude(amount=F4_DEPTH)


solid = f1_12.part
